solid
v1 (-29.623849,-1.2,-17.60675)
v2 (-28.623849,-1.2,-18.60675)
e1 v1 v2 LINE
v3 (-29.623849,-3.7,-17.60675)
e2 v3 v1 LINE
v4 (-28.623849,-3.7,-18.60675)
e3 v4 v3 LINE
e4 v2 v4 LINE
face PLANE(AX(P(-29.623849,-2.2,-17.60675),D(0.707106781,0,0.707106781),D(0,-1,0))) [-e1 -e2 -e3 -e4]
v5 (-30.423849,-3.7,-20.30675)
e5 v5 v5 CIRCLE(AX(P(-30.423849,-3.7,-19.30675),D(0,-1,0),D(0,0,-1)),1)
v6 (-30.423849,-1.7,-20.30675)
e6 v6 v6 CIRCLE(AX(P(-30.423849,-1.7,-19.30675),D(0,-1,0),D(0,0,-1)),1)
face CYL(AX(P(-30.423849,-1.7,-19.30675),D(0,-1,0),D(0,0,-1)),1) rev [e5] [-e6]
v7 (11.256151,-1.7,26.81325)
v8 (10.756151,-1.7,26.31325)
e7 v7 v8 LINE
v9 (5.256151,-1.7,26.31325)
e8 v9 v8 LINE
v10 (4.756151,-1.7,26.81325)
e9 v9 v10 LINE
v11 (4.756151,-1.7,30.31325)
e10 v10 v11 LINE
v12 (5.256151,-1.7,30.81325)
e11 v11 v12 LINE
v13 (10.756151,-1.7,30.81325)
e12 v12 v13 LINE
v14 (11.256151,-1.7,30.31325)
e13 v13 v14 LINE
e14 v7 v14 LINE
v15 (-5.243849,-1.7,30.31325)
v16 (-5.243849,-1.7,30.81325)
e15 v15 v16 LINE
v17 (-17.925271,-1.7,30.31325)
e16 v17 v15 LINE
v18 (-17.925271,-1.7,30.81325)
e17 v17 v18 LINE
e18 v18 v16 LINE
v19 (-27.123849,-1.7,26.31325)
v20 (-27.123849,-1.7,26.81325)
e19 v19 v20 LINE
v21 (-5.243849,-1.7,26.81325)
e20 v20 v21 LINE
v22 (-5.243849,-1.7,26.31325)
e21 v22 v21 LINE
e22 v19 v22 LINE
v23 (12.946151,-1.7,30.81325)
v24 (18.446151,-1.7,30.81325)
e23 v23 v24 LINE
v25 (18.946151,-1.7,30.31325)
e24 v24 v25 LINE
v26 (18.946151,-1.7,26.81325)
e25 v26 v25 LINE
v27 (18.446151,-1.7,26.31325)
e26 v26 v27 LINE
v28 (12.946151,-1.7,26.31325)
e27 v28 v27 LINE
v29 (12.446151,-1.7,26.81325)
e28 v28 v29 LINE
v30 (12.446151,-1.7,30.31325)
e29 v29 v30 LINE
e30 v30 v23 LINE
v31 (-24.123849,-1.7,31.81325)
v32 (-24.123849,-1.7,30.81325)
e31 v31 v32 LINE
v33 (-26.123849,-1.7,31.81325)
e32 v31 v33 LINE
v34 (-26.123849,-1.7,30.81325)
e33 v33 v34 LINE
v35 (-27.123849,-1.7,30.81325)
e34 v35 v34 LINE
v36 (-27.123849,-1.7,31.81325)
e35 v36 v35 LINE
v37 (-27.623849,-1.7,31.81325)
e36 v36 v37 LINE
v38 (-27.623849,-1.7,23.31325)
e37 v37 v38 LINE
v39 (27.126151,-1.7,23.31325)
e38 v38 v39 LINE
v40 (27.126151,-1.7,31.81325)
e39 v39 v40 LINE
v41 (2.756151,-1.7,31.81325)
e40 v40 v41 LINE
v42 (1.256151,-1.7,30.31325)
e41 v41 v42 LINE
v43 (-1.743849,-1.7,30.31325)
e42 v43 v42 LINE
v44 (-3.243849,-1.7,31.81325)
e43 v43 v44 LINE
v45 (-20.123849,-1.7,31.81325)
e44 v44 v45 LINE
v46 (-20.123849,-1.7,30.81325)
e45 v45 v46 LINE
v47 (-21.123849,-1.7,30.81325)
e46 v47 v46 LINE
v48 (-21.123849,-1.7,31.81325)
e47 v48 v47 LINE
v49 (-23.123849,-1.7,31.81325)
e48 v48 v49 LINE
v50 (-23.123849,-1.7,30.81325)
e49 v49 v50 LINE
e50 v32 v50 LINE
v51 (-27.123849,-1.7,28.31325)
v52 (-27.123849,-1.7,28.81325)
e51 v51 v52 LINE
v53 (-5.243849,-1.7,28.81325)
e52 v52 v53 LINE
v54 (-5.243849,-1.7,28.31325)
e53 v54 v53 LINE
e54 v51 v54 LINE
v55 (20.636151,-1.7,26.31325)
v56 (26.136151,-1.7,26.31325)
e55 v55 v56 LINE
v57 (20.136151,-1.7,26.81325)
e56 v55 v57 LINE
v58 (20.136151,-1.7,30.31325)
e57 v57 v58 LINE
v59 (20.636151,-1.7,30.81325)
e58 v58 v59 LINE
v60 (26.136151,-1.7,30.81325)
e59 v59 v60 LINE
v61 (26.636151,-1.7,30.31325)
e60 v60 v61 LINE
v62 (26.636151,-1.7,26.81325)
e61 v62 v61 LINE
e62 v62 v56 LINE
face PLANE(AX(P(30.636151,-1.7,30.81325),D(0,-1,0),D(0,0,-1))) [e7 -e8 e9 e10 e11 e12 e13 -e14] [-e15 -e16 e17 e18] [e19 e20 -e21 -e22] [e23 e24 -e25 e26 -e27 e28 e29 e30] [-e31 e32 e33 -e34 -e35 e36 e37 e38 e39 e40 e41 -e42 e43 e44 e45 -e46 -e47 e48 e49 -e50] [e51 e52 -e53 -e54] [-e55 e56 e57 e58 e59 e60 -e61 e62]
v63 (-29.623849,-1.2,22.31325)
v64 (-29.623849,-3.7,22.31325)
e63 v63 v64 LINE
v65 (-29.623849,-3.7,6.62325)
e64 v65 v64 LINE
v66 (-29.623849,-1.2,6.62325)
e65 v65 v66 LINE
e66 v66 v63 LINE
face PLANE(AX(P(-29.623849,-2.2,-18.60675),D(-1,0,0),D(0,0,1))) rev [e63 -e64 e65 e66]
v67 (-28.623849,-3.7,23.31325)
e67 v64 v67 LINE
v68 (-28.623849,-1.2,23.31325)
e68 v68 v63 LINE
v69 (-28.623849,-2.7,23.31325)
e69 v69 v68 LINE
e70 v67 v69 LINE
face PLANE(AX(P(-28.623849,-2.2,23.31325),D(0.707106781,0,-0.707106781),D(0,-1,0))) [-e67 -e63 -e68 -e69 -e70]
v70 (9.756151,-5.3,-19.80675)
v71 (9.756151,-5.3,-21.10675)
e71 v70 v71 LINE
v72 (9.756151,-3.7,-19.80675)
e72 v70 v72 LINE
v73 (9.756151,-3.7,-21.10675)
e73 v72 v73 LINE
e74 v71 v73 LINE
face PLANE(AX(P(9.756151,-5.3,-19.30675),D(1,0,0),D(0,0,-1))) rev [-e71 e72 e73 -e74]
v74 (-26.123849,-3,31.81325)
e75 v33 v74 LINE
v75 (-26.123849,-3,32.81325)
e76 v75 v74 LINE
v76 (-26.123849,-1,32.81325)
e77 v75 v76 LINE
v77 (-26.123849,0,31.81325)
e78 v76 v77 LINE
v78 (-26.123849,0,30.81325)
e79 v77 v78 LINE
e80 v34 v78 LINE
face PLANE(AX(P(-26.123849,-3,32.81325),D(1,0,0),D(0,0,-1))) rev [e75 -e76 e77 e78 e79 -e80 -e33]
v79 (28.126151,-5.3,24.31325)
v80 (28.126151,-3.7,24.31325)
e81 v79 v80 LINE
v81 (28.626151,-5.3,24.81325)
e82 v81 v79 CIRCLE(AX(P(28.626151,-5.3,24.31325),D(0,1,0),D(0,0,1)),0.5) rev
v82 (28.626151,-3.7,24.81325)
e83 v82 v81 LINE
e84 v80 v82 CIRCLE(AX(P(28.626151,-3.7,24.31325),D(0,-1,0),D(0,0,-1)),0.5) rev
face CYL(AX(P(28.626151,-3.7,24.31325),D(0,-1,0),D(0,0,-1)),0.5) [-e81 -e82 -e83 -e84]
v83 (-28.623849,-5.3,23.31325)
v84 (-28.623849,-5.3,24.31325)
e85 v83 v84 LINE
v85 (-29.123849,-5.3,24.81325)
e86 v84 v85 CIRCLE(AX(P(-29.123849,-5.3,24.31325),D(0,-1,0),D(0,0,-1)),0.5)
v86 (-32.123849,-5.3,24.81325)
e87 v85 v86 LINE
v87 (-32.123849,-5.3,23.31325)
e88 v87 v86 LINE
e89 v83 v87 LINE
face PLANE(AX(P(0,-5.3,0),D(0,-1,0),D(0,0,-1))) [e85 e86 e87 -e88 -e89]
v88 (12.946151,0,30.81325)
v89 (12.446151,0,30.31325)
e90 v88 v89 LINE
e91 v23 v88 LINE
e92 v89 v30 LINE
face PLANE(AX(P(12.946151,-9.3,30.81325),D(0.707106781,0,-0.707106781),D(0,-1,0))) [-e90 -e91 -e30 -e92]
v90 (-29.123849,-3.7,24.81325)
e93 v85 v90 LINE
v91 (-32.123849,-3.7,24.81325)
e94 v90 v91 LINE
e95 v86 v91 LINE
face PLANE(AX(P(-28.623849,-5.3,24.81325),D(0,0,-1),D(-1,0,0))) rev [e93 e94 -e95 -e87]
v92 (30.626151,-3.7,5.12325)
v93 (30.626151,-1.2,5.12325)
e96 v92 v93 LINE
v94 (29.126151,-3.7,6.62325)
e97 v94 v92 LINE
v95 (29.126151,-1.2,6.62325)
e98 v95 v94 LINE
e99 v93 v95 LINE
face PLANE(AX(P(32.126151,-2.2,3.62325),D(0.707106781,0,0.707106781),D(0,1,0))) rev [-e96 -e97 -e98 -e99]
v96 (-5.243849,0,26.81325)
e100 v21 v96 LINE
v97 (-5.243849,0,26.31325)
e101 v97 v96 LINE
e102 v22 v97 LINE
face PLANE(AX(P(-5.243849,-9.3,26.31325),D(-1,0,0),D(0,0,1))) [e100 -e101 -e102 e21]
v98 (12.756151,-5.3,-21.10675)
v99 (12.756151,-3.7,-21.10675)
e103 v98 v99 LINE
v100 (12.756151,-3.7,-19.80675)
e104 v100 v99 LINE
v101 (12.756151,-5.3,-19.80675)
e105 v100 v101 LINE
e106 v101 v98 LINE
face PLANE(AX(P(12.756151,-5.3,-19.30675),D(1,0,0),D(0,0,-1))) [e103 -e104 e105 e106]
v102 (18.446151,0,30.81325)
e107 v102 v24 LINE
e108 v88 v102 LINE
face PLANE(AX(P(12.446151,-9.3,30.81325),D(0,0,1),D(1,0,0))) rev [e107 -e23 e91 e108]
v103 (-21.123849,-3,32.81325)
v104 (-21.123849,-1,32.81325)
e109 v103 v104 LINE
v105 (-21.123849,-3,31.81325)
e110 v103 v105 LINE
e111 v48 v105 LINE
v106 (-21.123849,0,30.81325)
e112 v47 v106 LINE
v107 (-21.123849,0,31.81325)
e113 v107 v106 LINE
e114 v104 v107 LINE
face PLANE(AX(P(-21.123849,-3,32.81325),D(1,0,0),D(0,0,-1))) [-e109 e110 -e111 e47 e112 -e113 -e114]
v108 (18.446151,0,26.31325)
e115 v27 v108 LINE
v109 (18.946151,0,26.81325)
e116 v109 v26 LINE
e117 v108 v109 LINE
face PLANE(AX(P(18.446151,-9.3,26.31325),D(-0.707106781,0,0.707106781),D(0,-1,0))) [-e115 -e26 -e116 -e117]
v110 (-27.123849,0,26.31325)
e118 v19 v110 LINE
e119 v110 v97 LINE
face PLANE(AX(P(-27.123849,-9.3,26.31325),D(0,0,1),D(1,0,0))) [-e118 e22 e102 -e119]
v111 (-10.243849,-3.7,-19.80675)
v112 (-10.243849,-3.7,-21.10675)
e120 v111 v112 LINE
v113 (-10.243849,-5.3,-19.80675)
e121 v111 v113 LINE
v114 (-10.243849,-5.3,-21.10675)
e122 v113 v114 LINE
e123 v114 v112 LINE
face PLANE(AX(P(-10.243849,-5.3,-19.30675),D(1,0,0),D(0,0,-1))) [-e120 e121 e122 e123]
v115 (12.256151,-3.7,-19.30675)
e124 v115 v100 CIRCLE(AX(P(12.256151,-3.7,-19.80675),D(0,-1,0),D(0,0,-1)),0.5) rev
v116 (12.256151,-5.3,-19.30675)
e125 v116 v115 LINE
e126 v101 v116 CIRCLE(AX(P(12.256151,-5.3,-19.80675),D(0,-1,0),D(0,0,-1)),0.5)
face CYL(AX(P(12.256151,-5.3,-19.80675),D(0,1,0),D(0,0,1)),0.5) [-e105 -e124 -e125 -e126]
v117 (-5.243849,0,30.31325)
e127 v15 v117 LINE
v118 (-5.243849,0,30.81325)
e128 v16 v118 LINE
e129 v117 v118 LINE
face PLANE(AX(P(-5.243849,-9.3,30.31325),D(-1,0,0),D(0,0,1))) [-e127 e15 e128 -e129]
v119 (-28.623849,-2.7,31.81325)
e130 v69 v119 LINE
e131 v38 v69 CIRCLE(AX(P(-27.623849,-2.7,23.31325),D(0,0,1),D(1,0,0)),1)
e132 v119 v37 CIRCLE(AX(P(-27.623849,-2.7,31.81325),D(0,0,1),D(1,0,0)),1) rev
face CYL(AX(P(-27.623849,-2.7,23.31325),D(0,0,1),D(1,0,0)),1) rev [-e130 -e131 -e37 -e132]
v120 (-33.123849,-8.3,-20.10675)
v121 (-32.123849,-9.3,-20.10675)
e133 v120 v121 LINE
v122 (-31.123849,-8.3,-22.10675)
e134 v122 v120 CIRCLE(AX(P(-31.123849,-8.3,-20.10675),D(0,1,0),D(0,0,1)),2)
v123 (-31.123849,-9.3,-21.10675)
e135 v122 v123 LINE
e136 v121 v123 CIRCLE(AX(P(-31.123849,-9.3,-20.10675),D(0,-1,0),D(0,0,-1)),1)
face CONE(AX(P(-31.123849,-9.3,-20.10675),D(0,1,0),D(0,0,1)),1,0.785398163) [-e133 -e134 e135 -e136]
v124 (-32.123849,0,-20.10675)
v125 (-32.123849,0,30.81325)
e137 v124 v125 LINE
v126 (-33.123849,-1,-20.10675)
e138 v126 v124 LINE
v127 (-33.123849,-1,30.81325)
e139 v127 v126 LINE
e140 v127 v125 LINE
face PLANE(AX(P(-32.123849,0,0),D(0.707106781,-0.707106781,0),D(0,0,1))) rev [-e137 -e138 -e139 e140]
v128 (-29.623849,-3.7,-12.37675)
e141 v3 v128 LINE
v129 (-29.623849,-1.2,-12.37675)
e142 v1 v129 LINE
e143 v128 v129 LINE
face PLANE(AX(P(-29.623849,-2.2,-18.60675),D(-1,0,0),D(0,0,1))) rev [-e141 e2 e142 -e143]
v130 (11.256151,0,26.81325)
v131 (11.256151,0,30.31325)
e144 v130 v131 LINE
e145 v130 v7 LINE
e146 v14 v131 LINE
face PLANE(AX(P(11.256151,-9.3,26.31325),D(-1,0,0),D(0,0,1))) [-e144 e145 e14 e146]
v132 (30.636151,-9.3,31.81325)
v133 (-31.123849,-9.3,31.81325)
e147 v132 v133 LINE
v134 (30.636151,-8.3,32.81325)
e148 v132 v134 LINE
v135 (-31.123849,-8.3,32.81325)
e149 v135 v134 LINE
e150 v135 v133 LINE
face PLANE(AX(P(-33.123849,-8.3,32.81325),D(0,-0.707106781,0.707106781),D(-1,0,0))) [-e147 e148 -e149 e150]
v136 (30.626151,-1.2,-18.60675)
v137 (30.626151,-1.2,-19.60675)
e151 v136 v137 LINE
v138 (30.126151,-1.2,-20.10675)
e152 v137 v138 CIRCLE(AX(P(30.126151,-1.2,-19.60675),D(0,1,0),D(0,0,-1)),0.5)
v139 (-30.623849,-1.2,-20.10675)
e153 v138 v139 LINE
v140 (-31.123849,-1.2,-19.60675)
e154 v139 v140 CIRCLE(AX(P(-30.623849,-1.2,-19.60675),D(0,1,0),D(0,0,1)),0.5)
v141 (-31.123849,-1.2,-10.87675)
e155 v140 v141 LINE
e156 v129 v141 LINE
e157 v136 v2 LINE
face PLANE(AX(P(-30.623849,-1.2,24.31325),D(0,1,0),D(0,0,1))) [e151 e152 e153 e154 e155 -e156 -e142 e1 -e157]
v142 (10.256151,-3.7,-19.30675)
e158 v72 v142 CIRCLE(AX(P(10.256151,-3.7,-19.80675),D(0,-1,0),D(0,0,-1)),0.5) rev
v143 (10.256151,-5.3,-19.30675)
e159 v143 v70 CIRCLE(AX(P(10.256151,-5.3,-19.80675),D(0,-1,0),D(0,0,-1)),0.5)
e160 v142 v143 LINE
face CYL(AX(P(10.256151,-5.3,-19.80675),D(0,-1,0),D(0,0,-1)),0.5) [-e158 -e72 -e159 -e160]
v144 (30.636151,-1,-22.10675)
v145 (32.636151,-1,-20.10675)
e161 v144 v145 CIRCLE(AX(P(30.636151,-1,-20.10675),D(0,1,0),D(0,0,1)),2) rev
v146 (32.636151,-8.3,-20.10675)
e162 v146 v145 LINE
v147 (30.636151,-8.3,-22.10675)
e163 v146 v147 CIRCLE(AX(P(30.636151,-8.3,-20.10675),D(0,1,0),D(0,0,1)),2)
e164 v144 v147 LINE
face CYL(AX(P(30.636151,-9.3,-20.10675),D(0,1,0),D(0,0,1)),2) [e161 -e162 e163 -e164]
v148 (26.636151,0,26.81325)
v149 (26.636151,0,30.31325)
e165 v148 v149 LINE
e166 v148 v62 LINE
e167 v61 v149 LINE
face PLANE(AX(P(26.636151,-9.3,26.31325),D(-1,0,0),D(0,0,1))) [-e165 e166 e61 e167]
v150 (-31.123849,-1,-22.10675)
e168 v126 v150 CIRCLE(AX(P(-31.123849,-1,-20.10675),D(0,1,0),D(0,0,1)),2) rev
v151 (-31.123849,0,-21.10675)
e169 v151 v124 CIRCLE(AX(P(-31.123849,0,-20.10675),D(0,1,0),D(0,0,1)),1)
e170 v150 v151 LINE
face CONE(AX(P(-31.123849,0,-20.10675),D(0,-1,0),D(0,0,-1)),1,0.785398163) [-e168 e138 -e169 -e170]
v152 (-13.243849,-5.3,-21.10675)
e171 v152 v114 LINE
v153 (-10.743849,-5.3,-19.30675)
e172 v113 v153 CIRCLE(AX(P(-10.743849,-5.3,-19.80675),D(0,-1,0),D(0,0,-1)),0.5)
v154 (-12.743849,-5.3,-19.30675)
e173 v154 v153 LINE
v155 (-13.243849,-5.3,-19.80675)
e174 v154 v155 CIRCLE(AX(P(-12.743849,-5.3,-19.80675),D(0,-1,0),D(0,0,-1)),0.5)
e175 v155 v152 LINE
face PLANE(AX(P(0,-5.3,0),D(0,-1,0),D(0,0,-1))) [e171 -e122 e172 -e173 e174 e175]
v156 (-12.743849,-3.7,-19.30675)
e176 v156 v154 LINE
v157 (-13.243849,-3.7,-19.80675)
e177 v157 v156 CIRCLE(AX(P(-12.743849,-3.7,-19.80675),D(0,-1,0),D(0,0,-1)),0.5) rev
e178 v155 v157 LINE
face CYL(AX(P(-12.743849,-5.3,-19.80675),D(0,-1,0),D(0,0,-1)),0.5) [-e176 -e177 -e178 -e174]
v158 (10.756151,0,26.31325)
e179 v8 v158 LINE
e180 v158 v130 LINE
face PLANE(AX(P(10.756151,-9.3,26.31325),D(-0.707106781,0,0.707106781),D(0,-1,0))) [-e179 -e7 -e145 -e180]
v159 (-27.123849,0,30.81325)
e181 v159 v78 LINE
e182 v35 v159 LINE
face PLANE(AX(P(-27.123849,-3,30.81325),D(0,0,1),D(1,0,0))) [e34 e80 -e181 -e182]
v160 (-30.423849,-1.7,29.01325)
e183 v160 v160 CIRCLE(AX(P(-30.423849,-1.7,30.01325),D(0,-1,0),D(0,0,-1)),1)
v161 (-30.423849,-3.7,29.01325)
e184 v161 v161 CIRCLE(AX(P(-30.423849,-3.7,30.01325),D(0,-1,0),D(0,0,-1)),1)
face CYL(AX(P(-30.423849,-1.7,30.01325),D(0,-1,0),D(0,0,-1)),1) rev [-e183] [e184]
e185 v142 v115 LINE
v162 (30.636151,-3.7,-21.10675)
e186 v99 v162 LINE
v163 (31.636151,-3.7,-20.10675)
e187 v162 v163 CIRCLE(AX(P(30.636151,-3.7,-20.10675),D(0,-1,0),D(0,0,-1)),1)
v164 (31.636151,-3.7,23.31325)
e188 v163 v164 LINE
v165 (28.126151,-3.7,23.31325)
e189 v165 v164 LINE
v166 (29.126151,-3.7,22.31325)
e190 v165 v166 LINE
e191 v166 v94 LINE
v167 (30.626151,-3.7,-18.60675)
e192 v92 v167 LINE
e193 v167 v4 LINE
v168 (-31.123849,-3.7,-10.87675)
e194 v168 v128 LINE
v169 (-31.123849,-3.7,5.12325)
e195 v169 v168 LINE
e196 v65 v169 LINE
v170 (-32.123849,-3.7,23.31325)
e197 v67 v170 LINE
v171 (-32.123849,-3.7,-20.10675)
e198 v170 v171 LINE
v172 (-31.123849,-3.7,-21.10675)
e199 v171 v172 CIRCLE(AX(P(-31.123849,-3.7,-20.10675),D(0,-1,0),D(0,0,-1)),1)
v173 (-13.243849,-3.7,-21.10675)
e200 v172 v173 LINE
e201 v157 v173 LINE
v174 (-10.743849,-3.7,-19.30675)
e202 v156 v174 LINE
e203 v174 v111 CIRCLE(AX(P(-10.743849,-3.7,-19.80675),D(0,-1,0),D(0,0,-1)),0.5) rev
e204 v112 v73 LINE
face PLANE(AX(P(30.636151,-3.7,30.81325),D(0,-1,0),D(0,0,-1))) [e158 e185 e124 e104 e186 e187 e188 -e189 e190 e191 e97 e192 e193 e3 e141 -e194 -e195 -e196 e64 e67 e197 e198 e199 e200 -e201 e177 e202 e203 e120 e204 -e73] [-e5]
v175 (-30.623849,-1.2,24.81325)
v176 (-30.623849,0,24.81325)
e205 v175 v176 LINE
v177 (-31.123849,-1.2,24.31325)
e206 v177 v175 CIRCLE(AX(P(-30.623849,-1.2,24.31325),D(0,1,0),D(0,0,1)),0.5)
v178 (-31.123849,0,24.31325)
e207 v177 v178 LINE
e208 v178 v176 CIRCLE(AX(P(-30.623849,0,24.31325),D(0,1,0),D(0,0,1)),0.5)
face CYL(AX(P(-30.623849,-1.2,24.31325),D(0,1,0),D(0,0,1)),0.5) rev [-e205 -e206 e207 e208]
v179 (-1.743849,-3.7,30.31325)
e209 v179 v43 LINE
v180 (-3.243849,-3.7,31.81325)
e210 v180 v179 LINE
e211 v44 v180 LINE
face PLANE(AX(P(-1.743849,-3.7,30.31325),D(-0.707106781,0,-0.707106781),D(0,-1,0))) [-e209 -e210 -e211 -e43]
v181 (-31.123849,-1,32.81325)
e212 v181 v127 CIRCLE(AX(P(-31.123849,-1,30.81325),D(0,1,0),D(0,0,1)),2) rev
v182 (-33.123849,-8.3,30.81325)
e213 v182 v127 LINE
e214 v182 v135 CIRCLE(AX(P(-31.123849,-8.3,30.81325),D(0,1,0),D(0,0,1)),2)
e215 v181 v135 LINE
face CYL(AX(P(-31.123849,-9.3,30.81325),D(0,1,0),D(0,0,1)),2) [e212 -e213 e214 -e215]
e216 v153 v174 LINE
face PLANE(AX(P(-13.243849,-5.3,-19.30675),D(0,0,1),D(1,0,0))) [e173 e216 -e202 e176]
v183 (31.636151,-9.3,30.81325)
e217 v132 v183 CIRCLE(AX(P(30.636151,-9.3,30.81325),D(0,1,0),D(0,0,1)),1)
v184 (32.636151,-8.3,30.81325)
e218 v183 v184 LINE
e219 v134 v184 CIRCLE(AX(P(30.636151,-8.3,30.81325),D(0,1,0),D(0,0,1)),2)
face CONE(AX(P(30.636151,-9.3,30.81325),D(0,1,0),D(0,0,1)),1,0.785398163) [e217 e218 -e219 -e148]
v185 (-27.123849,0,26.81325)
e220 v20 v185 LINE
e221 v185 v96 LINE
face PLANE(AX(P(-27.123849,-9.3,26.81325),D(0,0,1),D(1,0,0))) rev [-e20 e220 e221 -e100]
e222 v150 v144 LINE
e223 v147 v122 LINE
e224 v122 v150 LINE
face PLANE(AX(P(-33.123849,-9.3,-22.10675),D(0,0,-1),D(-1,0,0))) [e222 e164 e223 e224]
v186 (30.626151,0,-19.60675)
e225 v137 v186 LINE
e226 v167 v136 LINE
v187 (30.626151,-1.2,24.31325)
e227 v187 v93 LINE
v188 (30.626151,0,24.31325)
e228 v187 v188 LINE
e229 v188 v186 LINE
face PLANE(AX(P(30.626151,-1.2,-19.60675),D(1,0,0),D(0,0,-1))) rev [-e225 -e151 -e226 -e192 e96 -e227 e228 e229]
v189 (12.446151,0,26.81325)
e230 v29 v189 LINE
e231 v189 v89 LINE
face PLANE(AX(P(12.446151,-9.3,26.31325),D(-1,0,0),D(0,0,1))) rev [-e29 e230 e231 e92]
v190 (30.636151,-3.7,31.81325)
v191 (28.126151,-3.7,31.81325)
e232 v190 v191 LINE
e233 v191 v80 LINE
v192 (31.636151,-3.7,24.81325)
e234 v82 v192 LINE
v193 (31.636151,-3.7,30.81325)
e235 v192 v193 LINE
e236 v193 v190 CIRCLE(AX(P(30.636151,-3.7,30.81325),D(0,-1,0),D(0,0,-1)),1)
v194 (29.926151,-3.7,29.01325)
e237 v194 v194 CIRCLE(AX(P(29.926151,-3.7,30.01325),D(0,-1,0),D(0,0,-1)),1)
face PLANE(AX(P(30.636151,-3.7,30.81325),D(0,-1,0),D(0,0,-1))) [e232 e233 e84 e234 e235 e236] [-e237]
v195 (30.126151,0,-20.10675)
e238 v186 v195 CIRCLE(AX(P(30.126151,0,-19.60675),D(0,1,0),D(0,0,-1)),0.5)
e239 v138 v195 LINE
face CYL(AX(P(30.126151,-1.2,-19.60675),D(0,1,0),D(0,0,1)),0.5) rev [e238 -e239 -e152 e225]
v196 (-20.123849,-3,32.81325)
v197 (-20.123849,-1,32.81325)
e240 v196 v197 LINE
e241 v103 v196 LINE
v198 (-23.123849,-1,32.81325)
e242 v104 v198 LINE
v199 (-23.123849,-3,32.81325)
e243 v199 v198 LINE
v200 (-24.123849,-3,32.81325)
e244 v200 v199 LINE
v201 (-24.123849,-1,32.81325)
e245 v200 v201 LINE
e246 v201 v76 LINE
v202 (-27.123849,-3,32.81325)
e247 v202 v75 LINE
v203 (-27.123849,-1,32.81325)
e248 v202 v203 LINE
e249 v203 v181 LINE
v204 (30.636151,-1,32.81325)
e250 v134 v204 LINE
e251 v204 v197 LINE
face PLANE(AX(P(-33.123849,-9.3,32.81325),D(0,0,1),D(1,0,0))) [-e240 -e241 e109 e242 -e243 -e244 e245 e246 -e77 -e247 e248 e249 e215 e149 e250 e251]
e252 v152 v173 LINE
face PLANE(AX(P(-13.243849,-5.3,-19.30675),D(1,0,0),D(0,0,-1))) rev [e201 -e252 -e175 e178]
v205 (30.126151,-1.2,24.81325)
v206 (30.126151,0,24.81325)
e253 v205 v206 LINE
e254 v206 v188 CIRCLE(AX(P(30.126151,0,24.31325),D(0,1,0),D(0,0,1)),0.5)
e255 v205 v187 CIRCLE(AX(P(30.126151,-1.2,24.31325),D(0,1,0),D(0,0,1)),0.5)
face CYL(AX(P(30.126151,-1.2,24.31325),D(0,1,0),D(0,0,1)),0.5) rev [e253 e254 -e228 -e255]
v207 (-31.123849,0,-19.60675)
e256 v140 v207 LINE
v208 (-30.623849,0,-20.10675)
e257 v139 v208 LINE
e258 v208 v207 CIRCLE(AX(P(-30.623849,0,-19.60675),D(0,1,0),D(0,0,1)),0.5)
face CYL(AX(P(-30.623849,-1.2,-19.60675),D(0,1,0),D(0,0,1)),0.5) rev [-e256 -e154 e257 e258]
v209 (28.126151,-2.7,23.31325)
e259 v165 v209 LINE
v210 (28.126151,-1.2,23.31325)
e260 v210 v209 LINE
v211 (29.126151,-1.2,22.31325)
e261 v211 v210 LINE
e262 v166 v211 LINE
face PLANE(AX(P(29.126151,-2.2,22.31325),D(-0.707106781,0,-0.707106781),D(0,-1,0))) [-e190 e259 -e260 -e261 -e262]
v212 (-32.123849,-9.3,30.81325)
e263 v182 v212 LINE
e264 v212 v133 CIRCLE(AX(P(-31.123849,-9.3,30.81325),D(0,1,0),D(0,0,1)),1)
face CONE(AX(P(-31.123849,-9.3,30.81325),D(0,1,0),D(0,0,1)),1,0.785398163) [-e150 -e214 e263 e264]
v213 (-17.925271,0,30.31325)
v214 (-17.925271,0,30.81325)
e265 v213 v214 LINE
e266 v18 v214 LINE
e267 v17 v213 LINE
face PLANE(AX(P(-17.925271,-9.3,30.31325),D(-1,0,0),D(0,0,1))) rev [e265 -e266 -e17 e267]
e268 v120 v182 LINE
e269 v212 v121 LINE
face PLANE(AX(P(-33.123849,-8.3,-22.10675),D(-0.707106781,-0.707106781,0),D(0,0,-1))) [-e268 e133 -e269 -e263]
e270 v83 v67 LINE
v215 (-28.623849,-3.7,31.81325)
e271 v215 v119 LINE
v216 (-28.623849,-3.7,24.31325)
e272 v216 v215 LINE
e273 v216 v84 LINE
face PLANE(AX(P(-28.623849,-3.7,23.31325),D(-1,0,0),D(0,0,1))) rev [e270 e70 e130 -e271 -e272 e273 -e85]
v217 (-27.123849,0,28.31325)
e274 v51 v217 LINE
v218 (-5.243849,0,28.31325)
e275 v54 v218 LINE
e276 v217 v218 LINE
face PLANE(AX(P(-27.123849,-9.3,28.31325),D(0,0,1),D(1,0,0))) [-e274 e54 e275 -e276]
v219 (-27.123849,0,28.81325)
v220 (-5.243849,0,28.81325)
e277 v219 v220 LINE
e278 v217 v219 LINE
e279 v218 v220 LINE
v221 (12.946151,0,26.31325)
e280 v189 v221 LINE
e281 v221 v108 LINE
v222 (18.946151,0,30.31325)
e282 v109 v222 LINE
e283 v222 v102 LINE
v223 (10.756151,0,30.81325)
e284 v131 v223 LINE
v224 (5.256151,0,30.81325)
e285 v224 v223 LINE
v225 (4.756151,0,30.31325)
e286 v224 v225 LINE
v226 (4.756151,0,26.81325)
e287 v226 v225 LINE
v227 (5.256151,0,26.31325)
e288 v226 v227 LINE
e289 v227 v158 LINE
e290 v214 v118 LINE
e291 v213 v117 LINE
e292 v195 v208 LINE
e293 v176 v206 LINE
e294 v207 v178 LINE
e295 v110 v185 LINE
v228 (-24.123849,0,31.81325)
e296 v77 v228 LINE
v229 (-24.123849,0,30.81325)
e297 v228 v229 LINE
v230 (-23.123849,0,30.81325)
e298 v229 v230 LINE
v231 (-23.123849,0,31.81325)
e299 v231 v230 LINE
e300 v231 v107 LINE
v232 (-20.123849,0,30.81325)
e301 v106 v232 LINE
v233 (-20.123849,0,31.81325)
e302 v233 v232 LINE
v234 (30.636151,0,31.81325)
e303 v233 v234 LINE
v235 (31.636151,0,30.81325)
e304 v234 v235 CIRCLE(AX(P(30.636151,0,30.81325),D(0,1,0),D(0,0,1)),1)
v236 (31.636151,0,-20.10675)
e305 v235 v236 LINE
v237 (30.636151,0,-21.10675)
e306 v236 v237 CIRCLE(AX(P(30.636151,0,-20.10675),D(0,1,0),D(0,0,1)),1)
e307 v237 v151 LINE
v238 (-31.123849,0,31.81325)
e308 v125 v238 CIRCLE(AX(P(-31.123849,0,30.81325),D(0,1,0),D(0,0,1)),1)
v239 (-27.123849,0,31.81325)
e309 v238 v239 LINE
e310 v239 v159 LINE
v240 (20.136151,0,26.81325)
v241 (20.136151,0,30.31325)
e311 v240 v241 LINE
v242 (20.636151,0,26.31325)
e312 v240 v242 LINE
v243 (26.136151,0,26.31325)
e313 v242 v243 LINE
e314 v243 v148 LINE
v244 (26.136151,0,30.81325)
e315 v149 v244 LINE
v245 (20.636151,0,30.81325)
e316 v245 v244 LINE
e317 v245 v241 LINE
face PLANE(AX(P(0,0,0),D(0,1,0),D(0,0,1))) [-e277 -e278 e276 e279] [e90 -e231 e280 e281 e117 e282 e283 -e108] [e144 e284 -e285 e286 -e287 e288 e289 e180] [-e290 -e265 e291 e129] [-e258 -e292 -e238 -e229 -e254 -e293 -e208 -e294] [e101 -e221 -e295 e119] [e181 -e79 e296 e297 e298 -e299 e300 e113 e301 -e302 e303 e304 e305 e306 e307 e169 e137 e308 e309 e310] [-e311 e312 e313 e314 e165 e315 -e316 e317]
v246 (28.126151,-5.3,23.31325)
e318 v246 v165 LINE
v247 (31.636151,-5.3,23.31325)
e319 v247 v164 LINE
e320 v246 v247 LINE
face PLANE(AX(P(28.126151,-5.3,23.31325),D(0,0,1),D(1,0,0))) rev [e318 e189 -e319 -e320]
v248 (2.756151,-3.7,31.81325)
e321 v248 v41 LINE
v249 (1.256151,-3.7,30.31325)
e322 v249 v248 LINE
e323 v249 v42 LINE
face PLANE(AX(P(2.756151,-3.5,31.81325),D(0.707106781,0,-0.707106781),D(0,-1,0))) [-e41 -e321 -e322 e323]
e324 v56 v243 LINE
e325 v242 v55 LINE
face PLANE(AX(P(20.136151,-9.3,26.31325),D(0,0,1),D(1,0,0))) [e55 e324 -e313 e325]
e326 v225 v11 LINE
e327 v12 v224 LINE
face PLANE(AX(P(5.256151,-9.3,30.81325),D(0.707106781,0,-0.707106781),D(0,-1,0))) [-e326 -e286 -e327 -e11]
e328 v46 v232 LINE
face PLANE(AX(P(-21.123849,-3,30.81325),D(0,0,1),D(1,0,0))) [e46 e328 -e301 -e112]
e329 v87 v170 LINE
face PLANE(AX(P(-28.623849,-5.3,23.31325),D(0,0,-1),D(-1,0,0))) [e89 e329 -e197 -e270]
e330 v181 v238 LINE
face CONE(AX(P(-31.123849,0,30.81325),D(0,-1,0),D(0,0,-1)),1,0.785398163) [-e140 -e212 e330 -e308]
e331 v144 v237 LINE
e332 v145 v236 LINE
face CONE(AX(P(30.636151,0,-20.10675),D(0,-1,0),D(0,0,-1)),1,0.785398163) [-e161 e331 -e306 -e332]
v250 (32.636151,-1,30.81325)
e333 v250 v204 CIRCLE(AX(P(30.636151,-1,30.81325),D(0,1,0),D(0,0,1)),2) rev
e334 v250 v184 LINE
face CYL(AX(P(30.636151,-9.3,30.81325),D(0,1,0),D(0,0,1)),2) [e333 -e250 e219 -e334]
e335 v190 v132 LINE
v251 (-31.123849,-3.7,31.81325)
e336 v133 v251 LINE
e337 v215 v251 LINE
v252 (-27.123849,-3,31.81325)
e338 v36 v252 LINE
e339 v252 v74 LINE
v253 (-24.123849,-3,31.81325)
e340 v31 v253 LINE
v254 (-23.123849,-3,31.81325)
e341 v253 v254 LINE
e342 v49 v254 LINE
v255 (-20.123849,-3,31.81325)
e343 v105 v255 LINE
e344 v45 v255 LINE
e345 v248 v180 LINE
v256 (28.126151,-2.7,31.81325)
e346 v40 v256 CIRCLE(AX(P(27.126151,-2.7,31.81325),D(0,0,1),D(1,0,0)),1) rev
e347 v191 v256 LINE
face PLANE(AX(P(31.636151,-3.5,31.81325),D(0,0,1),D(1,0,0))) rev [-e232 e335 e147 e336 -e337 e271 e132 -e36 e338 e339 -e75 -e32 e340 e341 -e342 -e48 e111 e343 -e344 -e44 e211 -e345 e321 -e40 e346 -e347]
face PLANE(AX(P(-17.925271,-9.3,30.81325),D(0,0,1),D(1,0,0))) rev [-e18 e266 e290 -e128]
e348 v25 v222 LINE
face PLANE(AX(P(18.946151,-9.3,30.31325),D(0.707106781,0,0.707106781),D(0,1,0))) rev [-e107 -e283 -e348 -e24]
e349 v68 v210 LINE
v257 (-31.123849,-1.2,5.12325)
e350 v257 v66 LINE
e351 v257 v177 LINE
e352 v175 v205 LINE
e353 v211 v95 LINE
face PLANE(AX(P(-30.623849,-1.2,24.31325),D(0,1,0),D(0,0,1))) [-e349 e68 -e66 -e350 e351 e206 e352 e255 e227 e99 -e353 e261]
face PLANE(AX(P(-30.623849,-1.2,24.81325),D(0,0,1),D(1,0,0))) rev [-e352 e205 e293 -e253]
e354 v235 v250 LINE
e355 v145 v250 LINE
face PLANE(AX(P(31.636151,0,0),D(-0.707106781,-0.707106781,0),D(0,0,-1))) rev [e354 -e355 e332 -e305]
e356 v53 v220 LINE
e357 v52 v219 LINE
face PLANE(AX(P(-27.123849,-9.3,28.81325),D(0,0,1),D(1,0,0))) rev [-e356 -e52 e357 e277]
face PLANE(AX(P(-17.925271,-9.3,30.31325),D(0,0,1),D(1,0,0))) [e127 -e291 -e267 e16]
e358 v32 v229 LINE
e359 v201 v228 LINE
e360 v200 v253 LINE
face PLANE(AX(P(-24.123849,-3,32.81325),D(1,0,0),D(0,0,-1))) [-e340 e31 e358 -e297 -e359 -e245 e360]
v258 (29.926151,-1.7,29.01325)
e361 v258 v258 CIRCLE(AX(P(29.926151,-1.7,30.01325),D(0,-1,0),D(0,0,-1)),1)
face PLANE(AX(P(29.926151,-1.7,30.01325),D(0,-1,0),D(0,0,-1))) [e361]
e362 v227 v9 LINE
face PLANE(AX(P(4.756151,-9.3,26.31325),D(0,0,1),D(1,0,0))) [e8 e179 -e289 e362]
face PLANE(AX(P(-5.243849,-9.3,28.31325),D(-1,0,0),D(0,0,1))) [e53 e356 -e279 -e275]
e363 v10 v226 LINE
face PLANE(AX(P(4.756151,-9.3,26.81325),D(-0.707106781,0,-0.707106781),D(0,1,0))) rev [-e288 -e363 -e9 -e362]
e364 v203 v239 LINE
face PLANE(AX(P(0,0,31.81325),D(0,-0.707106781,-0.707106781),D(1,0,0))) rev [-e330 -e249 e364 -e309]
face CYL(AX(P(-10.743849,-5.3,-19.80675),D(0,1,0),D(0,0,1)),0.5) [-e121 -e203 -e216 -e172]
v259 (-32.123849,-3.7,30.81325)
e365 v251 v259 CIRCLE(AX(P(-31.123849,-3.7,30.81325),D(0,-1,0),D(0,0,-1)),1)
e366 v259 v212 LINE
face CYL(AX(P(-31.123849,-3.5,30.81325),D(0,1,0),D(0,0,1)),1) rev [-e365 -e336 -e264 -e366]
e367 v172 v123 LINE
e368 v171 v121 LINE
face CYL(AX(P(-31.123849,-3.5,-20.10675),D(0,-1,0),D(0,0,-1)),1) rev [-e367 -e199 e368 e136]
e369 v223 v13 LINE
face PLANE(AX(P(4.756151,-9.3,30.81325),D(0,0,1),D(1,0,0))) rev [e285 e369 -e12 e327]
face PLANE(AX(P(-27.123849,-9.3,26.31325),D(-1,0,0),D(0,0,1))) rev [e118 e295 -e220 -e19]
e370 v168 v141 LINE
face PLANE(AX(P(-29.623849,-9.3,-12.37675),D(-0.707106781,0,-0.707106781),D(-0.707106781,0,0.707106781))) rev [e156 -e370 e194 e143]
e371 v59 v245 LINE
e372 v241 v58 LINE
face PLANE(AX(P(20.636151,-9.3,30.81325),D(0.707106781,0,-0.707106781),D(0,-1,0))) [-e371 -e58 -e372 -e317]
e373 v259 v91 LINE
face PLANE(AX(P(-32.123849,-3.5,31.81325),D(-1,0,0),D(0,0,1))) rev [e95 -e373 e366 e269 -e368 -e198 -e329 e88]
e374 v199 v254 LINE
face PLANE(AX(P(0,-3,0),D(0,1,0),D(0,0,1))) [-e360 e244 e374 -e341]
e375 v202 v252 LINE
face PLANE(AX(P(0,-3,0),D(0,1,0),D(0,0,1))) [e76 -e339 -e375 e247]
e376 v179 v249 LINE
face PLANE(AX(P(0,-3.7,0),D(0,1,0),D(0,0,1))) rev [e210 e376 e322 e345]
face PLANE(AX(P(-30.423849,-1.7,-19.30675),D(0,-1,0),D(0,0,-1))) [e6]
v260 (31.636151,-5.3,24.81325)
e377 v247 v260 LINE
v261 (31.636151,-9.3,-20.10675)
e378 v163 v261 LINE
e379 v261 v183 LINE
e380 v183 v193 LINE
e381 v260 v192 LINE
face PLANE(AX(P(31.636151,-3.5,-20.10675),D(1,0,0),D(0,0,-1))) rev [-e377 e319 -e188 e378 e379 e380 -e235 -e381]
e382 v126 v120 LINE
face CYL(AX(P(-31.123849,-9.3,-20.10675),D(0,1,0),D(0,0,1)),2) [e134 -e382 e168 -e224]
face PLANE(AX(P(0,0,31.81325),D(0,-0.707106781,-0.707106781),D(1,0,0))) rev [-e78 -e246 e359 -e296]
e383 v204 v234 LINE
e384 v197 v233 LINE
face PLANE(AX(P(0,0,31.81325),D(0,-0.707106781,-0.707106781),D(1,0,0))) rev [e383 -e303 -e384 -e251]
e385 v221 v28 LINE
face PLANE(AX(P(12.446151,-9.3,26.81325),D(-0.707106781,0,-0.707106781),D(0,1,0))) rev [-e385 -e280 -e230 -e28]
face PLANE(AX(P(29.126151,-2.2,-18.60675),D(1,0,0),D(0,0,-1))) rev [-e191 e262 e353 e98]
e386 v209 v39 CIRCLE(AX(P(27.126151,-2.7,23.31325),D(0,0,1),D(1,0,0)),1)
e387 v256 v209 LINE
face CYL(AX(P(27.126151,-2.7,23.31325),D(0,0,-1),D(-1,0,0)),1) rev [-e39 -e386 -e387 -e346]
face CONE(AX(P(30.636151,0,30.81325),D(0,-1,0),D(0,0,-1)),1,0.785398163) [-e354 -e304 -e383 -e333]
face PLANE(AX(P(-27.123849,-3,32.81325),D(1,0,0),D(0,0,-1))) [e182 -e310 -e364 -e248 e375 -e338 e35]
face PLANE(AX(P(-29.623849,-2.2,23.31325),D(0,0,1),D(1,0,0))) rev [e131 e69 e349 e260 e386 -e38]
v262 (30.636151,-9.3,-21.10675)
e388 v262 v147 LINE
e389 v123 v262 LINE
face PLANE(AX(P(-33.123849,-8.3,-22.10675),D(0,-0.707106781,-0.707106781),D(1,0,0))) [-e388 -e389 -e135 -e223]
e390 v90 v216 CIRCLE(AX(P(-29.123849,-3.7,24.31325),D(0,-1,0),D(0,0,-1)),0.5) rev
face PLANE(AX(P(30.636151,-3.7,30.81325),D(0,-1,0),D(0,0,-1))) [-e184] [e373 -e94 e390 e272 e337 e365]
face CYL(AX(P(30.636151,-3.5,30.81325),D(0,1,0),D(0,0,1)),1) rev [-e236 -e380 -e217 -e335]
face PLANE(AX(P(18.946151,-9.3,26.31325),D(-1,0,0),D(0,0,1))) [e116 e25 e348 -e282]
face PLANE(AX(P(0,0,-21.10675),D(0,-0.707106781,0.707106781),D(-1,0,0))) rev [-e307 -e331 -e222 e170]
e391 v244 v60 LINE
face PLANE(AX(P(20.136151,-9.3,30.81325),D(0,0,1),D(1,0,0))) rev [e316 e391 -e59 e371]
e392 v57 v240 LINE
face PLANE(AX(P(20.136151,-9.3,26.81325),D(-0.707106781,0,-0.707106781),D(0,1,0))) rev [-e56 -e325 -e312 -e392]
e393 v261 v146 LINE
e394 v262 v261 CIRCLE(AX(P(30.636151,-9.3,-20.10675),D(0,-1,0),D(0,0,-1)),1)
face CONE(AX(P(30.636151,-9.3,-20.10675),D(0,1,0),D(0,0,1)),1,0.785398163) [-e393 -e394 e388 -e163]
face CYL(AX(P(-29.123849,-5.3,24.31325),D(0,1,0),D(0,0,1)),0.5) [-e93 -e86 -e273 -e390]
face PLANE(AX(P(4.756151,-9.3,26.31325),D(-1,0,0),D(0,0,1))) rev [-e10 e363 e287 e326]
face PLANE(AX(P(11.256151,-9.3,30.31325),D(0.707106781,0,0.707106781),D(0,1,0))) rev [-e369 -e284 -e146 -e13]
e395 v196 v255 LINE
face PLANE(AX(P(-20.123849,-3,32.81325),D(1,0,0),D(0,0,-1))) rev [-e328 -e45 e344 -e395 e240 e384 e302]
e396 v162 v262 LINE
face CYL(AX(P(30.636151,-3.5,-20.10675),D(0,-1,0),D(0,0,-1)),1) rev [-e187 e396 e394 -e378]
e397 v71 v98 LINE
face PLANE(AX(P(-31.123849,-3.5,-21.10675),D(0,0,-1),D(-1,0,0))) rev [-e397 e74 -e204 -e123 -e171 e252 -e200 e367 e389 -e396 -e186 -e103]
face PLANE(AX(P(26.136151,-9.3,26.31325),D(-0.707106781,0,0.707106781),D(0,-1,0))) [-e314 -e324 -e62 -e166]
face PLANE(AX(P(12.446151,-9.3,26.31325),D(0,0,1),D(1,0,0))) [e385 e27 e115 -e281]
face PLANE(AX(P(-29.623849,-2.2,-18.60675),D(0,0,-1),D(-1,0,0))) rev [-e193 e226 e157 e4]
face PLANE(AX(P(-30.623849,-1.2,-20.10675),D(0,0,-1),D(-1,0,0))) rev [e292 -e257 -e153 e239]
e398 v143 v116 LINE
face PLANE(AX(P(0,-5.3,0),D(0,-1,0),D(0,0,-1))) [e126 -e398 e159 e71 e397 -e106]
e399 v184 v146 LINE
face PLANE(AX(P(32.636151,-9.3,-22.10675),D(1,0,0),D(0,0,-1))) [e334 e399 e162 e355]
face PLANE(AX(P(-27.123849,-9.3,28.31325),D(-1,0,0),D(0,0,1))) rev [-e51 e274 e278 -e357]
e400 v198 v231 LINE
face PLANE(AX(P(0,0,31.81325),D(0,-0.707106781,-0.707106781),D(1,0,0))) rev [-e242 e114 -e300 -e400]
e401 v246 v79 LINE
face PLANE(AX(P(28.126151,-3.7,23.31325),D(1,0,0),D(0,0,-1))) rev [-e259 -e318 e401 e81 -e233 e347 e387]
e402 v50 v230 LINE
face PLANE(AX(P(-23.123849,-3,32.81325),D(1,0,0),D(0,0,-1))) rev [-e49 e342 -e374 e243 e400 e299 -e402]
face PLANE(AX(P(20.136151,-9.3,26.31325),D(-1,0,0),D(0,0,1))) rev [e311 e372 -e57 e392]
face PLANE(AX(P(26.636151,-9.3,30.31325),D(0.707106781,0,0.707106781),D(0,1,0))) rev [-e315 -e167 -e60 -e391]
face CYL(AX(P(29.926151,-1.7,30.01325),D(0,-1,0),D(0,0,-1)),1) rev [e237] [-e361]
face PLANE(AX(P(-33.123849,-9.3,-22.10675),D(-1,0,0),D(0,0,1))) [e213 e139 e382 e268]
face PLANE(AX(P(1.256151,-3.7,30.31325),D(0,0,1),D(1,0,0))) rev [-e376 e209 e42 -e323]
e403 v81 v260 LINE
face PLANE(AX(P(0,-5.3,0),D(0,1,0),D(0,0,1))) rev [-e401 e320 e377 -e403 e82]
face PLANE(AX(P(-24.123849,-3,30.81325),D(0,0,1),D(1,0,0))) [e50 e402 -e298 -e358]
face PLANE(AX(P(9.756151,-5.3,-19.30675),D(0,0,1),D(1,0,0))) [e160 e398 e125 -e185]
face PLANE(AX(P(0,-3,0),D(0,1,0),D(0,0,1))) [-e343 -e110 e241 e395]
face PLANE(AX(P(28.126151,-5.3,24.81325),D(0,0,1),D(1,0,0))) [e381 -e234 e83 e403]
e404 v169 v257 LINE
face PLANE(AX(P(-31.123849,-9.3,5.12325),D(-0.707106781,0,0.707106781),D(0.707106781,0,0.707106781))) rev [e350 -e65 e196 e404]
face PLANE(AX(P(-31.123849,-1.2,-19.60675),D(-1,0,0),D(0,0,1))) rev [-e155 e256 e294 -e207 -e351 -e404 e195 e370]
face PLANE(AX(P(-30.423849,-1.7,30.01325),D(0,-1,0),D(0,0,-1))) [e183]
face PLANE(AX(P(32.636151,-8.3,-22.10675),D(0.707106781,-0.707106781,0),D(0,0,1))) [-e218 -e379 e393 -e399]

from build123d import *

# Parameters (mm, degrees)
SKETCH_1_W           = 65.76
SKETCH_1_H           = 54.92
EXTRUDE_1_DEPTH      = 9.3
FILLET_1_R           = 2
CUT_EXTRUDE_1_DEPTH  = 1.2
SKETCH_3_W           = 58.75
SKETCH_3_H           = 41.92
CUT_EXTRUDE_2_DEPTH  = 1
CHAMFER_2_SIZE       = 1
SKETCH_7_W           = 2
SKETCH_7_H           = 41.92
CUT_EXTRUDE_5_DEPTH  = 48.162577855
CUT_EXTRUDE_6_DEPTH  = 5.8
SKETCH_10_W          = 1.5
SKETCH_10_H          = 22.23
CUT_EXTRUDE_7_DEPTH  = 1
CHAMFER_8_SIZE       = 3
CHAMFER_9_SIZE       = 1
FILLET_2_R           = 2
CHAMFER_11_SIZE      = 1
FILLET_3_R           = 1
SKETCH_14_W          = 12.681422007
SKETCH_14_H          = 0.5
SKETCH_14_W_2        = 21.88
SKETCH_14_W_3        = 6.5
SKETCH_14_H_2        = 4.5
CUT_EXTRUDE_9_DEPTH  = 48.543545828
CHAMFER_14_SIZE      = 0.5
SKETCH_14_3_W        = 1
SKETCH_14_3_H        = 2
CUT_EXTRUDE_10_DEPTH = 3
CUT_EXTRUDE_11_DEPTH = 1.8
EXTRUDE_3_DEPTH      = 2
FILLET_5_R           = 1
SKETCH_23_R          = 1
CUT_EXTRUDE_14_DEPTH = 2
SKETCH_23_3_W        = 3
SKETCH_23_3_H        = 1.8
SKETCH_23_3_W_2      = 3.5
SKETCH_23_3_H_2      = 1.5
SKETCH_23_3_W_3      = 3.51
EXTRUDE_4_DEPTH      = 1.6
FILLET_7_R           = 0.5
SKETCH_26_W          = 3
SKETCH_26_H          = 1.5
EXTRUDE_6_DEPTH      = 2
CHAMFER_18_SIZE      = 1.5
CUT_EXTRUDE_15_DEPTH = 48.323448204
CHAMFER_19_SIZE      = 1


# Some blends are built 0.0001 mm under size
with BuildPart() as part:
    # 草图1 → 凸台-拉伸1 (new body)
    with BuildSketch(Plane(origin=(0, 0, 0), x_dir=(1, 0, 0), z_dir=(0, 1, 0))):
        with Locations((-0.243849372, -5.353249651)):
            Rectangle(SKETCH_1_W, SKETCH_1_H)
    extrude(amount=-EXTRUDE_1_DEPTH)

    # 圆角1
    fillet_1_edges = [part.edges().sort_by_distance(p)[0] for p in [
        (-33.123849372, -4.65, -22.106750349),
        (32.636150628, -4.65, -22.106750349),
    ]]
    fillet(fillet_1_edges, radius=FILLET_1_R)

    # 草图2 → 切除-拉伸1 (cut)
    with BuildSketch(Plane(origin=(0, 0, 0), x_dir=(1, 0, 0), z_dir=(0, 1, 0))):
        with BuildLine():
            Line((-30.623849372, 20.106750349), (30.126150628, 20.106750349))
            ThreePointArc((30.126150628, 20.106750349), (30.479704018, 19.960303739), (30.626150628, 19.606750349))
            Line((30.626150628, 19.606750349), (30.626150628, -24.313249651))
            ThreePointArc((30.626150628, -24.313249651), (30.479704018, -24.666803042), (30.126150628, -24.813249651))
            Line((30.126150628, -24.813249651), (-30.623849372, -24.813249651))
            ThreePointArc((-30.623849372, -24.813249651), (-30.977402763, -24.666803042), (-31.123849372, -24.313249651))
            Line((-31.123849372, -24.313249651), (-31.123849372, 19.606750349))
            ThreePointArc((-31.123849372, 19.606750349), (-30.977402763, 19.960303739), (-30.623849372, 20.106750349))
        make_face()
    extrude(amount=-CUT_EXTRUDE_1_DEPTH, mode=Mode.SUBTRACT)

    # 草图3 → 切除-拉伸2 (cut)
    with BuildSketch(Plane(origin=(0, -1.2, 0), x_dir=(1, 0, 0), z_dir=(0, 1, 0))):
        with Locations((-0.248849372, -2.353249651)):
            Rectangle(SKETCH_3_W, SKETCH_3_H)
    extrude(amount=-CUT_EXTRUDE_2_DEPTH, mode=Mode.SUBTRACT)

    # 倒角2
    chamfer_2_edges = [part.edges().sort_by_distance(p)[0] for p in [
        (-33.123849372, 0, 6.353249651),
        (-0.243849372, 0, -22.106750349),
        (-32.538062935, 0, -21.520963911),
        (32.05036419, 0, -21.520963911),
        (32.636150628, 0, 6.353249651),
    ]]
    chamfer(chamfer_2_edges, length=CHAMFER_2_SIZE)

    # 草图7 → 切除-拉伸5 (cut, through all)
    with BuildSketch(Plane(origin=(0, -2.2, 0), x_dir=(1, 0, 0), z_dir=(0, 1, 0))):
        with Locations((-28.623849372, -2.353249651)):
            Rectangle(SKETCH_7_W, SKETCH_7_H)
    extrude(amount=-CUT_EXTRUDE_5_DEPTH, mode=Mode.SUBTRACT)

    # 草图8 → 切除-拉伸6 (cut)
    with BuildSketch(Plane.XZ.offset(9.3)):
        with BuildLine():
            Line((-31.123849372, -21.106750349), (30.636150628, -21.106750349))
            ThreePointArc((30.636150628, -21.106750349), (31.343257409, -20.81385713), (31.636150628, -20.106750349))
            Line((31.636150628, -20.106750349), (31.636150628, 31.813249651))
            Line((31.636150628, 31.813249651), (-32.123849372, 31.813249651))
            Line((-32.123849372, 31.813249651), (-32.123849372, -20.106750349))
            ThreePointArc((-32.123849372, -20.106750349), (-31.830956154, -20.81385713), (-31.123849372, -21.106750349))
        make_face()
    extrude(amount=-CUT_EXTRUDE_6_DEPTH, mode=Mode.SUBTRACT)

    # 草图10 → 切除-拉伸7 (cut)
    with BuildSketch(Plane(origin=(0, -1.2, 0), x_dir=(1, 0, 0), z_dir=(0, 1, 0))):
        with Locations((29.876150628, 7.491750349)):
            Rectangle(SKETCH_10_W, SKETCH_10_H)
    extrude(amount=-CUT_EXTRUDE_7_DEPTH, mode=Mode.SUBTRACT)

    # 倒角8
    # the kernel refuses this chamfer: 3 mm, written as the material it takes off along each edge
    with BuildSketch(Plane(origin=(29.126150628, 6.515048964, 3.623249651), x_dir=(0.9996219169112968, 0, -0.027495876610586365), z_dir=(0, -1, 0))) as chamfer_8_piece_1_section:
        Polygon((CHAMFER_8_SIZE * 0.999621916911, CHAMFER_8_SIZE * 0.0274958766106), (-CHAMFER_8_SIZE * 0.0274958766106, CHAMFER_8_SIZE * 0.999621916911), (0, 0), align=None)
    chamfer_8_piece_1 = extrude(amount=8.715048964, mode=Mode.PRIVATE)
    chamfer_8_piece_1 = split(chamfer_8_piece_1, bisect_by=Plane(origin=(30.626150628, -1.7, 4.789916318), z_dir=(-1, 0, 0)), keep=Keep.TOP, mode=Mode.PRIVATE)
    add(chamfer_8_piece_1, mode=Mode.SUBTRACT)

    # 倒角9
    chamfer_9_edges = [part.edges().sort_by_distance(p)[0] for p in [
        (-29.623849372, -2.35, 23.313249651),
        (-29.623849372, -2.35, -18.606750349),
        (29.126150628, -1.7, 23.313249651),
    ]]
    chamfer(chamfer_9_edges, length=CHAMFER_9_SIZE)

    # 圆角2
    fillet_2_edges = [part.edges().sort_by_distance(p)[0] for p in [
        (32.636150628, -5.15, 32.813249651),
        (-33.123849372, -5.15, 32.813249651),
    ]]
    fillet(fillet_2_edges, radius=FILLET_2_R)

    # 倒角11
    chamfer_11_edges = [part.edges().sort_by_distance(p)[0] for p in [
        (-31.641487463, 0, 32.745101304),
        (31.153788718, 0, 32.745101304),
        (-0.243849372, 0, 32.813249651),
    ]]
    chamfer(chamfer_11_edges, length=CHAMFER_11_SIZE - 0.0001)  # a hair under: the kernel refuses the full size

    # 圆角3
    fillet_3_edges = [part.edges().sort_by_distance(p)[0] for p in [
        (-32.123849372, -6.4, 31.813249651),
        (31.636150628, -6.4, 31.813249651),
    ]]
    fillet(fillet_3_edges, radius=FILLET_3_R)

    # 草图14 → 切除-拉伸9 (cut, through all)
    with BuildSketch(Plane(origin=(0, 0, 0), x_dir=(1, 0, 0), z_dir=(0, 1, 0))):
        with Locations((-11.584560376, -30.563249651)):
            Rectangle(SKETCH_14_W, SKETCH_14_H)
        with Locations((-16.183849372, -26.563249651)):
            Rectangle(SKETCH_14_W_2, SKETCH_14_H)
        with Locations((-16.183849372, -28.563249651)):
            Rectangle(SKETCH_14_W_2, SKETCH_14_H)
        with Locations((8.006150628, -28.563249651)):
            Rectangle(SKETCH_14_W_3, SKETCH_14_H_2)
        with Locations((15.696150628, -28.563249651)):
            Rectangle(SKETCH_14_W_3, SKETCH_14_H_2)
        with Locations((23.386150628, -28.563249651)):
            Rectangle(SKETCH_14_W_3, SKETCH_14_H_2)
    extrude(amount=-CUT_EXTRUDE_9_DEPTH, mode=Mode.SUBTRACT)

    # 倒角14
    chamfer_14_edges = [part.edges().sort_by_distance(p)[0] for p in [
        (20.136150628, -1.75, 26.313249651),
        (26.636150628, -1.75, 26.313249651),
        (26.636150628, -1.75, 30.813249651),
        (20.136150628, -1.75, 30.813249651),
        (12.446150628, -1.75, 26.313249651),
        (18.946150628, -1.75, 26.313249651),
        (18.946150628, -1.75, 30.813249651),
        (12.446150628, -1.75, 30.813249651),
        (4.756150628, -1.75, 30.813249651),
        (4.756150628, -1.75, 26.313249651),
        (11.256150628, -1.75, 26.313249651),
        (11.256150628, -1.75, 30.813249651),
    ]]
    chamfer(chamfer_14_edges, length=CHAMFER_14_SIZE)

    # 草图14<3> → 切除-拉伸10 (cut)
    with BuildSketch(Plane(origin=(0, 0, 0), x_dir=(1, 0, 0), z_dir=(0, 1, 0))):
        with Locations((-26.623849372, -31.813249651)):
            Rectangle(SKETCH_14_3_W, SKETCH_14_3_H)
        with Locations((-23.623849372, -31.813249651)):
            Rectangle(SKETCH_14_3_W, SKETCH_14_3_H)
        with Locations((-20.623849372, -31.813249651)):
            Rectangle(SKETCH_14_3_W, SKETCH_14_3_H)
    extrude(amount=-CUT_EXTRUDE_10_DEPTH, mode=Mode.SUBTRACT)

    # 草图19 → 切除-拉伸11 (cut)
    with BuildSketch(Plane.XZ.offset(3.5)):
        with BuildLine():
            Line((30.636150628, 31.813249651), (-31.123849372, 31.813249651))
            ThreePointArc((-31.123849372, 31.813249651), (-31.830956154, 31.520356433), (-32.123849372, 30.813249651))
            Line((-32.123849372, 30.813249651), (-32.123849372, -20.106750349))
            ThreePointArc((-32.123849372, -20.106750349), (-31.830956154, -20.81385713), (-31.123849372, -21.106750349))
            Line((-31.123849372, -21.106750349), (30.636150628, -21.106750349))
            ThreePointArc((30.636150628, -21.106750349), (31.343257409, -20.81385713), (31.636150628, -20.106750349))
            Line((31.636150628, -20.106750349), (31.636150628, 30.813249651))
            ThreePointArc((31.636150628, 30.813249651), (31.343257409, 31.520356433), (30.636150628, 31.813249651))
        make_face()
    extrude(amount=-CUT_EXTRUDE_11_DEPTH, mode=Mode.SUBTRACT)

    # 草图22 → 凸台-拉伸3 (add)
    with BuildSketch(Plane.XZ.offset(1.7)):
        with BuildLine():
            Line((30.626150628, 5.123249651), (30.626150628, -18.606750349))
            Line((30.626150628, -18.606750349), (-28.623849372, -18.606750349))
            Line((-28.623849372, -18.606750349), (-29.623849372, -17.606750349))
            Line((-29.623849372, -17.606750349), (-29.623849372, 22.313249651))
            Line((-29.623849372, 22.313249651), (-28.623849372, 23.313249651))
            Line((-28.623849372, 23.313249651), (-28.623849372, 31.813249651))
            Line((-28.623849372, 31.813249651), (-31.123849372, 31.813249651))
            ThreePointArc((-31.123849372, 31.813249651), (-31.830956154, 31.520356433), (-32.123849372, 30.813249651))
            Line((-32.123849372, 30.813249651), (-32.123849372, -20.106750349))
            ThreePointArc((-32.123849372, -20.106750349), (-31.830956154, -20.81385713), (-31.123849372, -21.106750349))
            Line((-31.123849372, -21.106750349), (30.636150628, -21.106750349))
            ThreePointArc((30.636150628, -21.106750349), (31.343257409, -20.81385713), (31.636150628, -20.106750349))
            Line((31.636150628, -20.106750349), (31.636150628, 30.813249651))
            ThreePointArc((31.636150628, 30.813249651), (31.343257409, 31.520356433), (30.636150628, 31.813249651))
            Line((30.636150628, 31.813249651), (28.126150628, 31.813249651))
            Line((28.126150628, 31.813249651), (28.126150628, 23.313249651))
            Line((28.126150628, 23.313249651), (29.126150628, 22.313249651))
            Line((29.126150628, 22.313249651), (29.126150628, 6.623249651))
            Line((29.126150628, 6.623249651), (30.626150628, 5.123249651))
        make_face()
    extrude(amount=EXTRUDE_3_DEPTH)

    # 圆角5
    fillet_5_edges = [part.edges().sort_by_distance(p)[0] for p in [
        (-28.623849372, -1.7, 27.563249651),
        (28.126150628, -1.7, 27.563249651),
    ]]
    fillet(fillet_5_edges, radius=FILLET_5_R)

    # 草图23 → 切除-拉伸14 (cut)
    with BuildSketch(Plane.XZ.offset(3.7)):
        with Locations(Location((-30.423849372, 30.013249651, 0), (0, 0, 270))):
            Circle(SKETCH_23_R)
        with Locations(Location((-30.423849372, -19.306750349, 0), (0, 0, 270))):
            Circle(SKETCH_23_R)
        with Locations(Location((29.926150628, 30.013249651, 0), (0, 0, 270))):
            Circle(SKETCH_23_R)
    extrude(amount=-CUT_EXTRUDE_14_DEPTH, mode=Mode.SUBTRACT)

    # 草图23<3> → 凸台-拉伸4 (add)
    with BuildSketch(Plane.XZ.offset(3.7)):
        with Locations((-11.743849372, -20.206750349)):
            Rectangle(SKETCH_23_3_W, SKETCH_23_3_H)
        with Locations((-30.373849372, 24.063249651)):
            Rectangle(SKETCH_23_3_W_2, SKETCH_23_3_H_2)
        with Locations((29.881150628, 24.063249651)):
            Rectangle(SKETCH_23_3_W_3, SKETCH_23_3_H_2)
        with Locations((11.256150628, -20.206750349)):
            Rectangle(SKETCH_23_3_W, SKETCH_23_3_H)
    extrude(amount=EXTRUDE_4_DEPTH)

    # 圆角7
    fillet_7_edges = [part.edges().sort_by_distance(p)[0] for p in [
        (28.126150628, -4.5, 24.813249651),
        (-28.623849372, -4.5, 24.813249651),
        (-13.243849372, -4.5, -19.306750349),
        (-10.243849372, -4.5, -19.306750349),
        (9.756150628, -4.5, -19.306750349),
        (12.756150628, -4.5, -19.306750349),
    ]]
    fillet(fillet_7_edges, radius=FILLET_7_R)

    # 草图26 → 凸台-拉伸6 (add)
    with BuildSketch(Plane.XZ.offset(1.7)):
        with Locations((-0.243849372, 31.063249651)):
            Rectangle(SKETCH_26_W, SKETCH_26_H)
    extrude(amount=EXTRUDE_6_DEPTH)

    # 倒角18
    chamfer_18_edges = [part.edges().sort_by_distance(p)[0] for p in [
        (1.256150628, -2.7, 31.813249651),
        (-1.743849372, -2.7, 31.813249651),
    ]]
    chamfer(chamfer_18_edges, length=CHAMFER_18_SIZE - 0.0001)  # a hair under: the kernel refuses the full size

    # 草图28 → 切除-拉伸15 (cut, through all)
    with BuildSketch(Plane(origin=(0, -1.2, 0), x_dir=(1, 0, 0), z_dir=(0, 1, 0))):
        Polygon((-31.123849372, -5.123249651), (-29.623849372, -6.623249651), (-29.623849372, 12.376750349), (-31.123849372, 10.876750349), align=None)
    extrude(amount=-CUT_EXTRUDE_15_DEPTH, mode=Mode.SUBTRACT)

    # 倒角19
    chamfer_19_edges = [part.edges().sort_by_distance(p)[0] for p in [
        (-0.243849372, -9.3, 32.813249651),
        (32.636150628, -9.3, 5.353249651),
        (-32.538062935, -9.3, 32.227463214),
        (32.05036419, -9.3, 32.227463214),
        (-0.243849372, -9.3, -22.106750349),
        (-33.123849372, -9.3, 5.353249651),
        (-32.538062935, -9.3, -21.520963911),
        (32.05036419, -9.3, -21.520963911),
    ]]
    chamfer(chamfer_19_edges, length=CHAMFER_19_SIZE - 0.0001)  # a hair under: the kernel refuses the full size


solid = part.part
